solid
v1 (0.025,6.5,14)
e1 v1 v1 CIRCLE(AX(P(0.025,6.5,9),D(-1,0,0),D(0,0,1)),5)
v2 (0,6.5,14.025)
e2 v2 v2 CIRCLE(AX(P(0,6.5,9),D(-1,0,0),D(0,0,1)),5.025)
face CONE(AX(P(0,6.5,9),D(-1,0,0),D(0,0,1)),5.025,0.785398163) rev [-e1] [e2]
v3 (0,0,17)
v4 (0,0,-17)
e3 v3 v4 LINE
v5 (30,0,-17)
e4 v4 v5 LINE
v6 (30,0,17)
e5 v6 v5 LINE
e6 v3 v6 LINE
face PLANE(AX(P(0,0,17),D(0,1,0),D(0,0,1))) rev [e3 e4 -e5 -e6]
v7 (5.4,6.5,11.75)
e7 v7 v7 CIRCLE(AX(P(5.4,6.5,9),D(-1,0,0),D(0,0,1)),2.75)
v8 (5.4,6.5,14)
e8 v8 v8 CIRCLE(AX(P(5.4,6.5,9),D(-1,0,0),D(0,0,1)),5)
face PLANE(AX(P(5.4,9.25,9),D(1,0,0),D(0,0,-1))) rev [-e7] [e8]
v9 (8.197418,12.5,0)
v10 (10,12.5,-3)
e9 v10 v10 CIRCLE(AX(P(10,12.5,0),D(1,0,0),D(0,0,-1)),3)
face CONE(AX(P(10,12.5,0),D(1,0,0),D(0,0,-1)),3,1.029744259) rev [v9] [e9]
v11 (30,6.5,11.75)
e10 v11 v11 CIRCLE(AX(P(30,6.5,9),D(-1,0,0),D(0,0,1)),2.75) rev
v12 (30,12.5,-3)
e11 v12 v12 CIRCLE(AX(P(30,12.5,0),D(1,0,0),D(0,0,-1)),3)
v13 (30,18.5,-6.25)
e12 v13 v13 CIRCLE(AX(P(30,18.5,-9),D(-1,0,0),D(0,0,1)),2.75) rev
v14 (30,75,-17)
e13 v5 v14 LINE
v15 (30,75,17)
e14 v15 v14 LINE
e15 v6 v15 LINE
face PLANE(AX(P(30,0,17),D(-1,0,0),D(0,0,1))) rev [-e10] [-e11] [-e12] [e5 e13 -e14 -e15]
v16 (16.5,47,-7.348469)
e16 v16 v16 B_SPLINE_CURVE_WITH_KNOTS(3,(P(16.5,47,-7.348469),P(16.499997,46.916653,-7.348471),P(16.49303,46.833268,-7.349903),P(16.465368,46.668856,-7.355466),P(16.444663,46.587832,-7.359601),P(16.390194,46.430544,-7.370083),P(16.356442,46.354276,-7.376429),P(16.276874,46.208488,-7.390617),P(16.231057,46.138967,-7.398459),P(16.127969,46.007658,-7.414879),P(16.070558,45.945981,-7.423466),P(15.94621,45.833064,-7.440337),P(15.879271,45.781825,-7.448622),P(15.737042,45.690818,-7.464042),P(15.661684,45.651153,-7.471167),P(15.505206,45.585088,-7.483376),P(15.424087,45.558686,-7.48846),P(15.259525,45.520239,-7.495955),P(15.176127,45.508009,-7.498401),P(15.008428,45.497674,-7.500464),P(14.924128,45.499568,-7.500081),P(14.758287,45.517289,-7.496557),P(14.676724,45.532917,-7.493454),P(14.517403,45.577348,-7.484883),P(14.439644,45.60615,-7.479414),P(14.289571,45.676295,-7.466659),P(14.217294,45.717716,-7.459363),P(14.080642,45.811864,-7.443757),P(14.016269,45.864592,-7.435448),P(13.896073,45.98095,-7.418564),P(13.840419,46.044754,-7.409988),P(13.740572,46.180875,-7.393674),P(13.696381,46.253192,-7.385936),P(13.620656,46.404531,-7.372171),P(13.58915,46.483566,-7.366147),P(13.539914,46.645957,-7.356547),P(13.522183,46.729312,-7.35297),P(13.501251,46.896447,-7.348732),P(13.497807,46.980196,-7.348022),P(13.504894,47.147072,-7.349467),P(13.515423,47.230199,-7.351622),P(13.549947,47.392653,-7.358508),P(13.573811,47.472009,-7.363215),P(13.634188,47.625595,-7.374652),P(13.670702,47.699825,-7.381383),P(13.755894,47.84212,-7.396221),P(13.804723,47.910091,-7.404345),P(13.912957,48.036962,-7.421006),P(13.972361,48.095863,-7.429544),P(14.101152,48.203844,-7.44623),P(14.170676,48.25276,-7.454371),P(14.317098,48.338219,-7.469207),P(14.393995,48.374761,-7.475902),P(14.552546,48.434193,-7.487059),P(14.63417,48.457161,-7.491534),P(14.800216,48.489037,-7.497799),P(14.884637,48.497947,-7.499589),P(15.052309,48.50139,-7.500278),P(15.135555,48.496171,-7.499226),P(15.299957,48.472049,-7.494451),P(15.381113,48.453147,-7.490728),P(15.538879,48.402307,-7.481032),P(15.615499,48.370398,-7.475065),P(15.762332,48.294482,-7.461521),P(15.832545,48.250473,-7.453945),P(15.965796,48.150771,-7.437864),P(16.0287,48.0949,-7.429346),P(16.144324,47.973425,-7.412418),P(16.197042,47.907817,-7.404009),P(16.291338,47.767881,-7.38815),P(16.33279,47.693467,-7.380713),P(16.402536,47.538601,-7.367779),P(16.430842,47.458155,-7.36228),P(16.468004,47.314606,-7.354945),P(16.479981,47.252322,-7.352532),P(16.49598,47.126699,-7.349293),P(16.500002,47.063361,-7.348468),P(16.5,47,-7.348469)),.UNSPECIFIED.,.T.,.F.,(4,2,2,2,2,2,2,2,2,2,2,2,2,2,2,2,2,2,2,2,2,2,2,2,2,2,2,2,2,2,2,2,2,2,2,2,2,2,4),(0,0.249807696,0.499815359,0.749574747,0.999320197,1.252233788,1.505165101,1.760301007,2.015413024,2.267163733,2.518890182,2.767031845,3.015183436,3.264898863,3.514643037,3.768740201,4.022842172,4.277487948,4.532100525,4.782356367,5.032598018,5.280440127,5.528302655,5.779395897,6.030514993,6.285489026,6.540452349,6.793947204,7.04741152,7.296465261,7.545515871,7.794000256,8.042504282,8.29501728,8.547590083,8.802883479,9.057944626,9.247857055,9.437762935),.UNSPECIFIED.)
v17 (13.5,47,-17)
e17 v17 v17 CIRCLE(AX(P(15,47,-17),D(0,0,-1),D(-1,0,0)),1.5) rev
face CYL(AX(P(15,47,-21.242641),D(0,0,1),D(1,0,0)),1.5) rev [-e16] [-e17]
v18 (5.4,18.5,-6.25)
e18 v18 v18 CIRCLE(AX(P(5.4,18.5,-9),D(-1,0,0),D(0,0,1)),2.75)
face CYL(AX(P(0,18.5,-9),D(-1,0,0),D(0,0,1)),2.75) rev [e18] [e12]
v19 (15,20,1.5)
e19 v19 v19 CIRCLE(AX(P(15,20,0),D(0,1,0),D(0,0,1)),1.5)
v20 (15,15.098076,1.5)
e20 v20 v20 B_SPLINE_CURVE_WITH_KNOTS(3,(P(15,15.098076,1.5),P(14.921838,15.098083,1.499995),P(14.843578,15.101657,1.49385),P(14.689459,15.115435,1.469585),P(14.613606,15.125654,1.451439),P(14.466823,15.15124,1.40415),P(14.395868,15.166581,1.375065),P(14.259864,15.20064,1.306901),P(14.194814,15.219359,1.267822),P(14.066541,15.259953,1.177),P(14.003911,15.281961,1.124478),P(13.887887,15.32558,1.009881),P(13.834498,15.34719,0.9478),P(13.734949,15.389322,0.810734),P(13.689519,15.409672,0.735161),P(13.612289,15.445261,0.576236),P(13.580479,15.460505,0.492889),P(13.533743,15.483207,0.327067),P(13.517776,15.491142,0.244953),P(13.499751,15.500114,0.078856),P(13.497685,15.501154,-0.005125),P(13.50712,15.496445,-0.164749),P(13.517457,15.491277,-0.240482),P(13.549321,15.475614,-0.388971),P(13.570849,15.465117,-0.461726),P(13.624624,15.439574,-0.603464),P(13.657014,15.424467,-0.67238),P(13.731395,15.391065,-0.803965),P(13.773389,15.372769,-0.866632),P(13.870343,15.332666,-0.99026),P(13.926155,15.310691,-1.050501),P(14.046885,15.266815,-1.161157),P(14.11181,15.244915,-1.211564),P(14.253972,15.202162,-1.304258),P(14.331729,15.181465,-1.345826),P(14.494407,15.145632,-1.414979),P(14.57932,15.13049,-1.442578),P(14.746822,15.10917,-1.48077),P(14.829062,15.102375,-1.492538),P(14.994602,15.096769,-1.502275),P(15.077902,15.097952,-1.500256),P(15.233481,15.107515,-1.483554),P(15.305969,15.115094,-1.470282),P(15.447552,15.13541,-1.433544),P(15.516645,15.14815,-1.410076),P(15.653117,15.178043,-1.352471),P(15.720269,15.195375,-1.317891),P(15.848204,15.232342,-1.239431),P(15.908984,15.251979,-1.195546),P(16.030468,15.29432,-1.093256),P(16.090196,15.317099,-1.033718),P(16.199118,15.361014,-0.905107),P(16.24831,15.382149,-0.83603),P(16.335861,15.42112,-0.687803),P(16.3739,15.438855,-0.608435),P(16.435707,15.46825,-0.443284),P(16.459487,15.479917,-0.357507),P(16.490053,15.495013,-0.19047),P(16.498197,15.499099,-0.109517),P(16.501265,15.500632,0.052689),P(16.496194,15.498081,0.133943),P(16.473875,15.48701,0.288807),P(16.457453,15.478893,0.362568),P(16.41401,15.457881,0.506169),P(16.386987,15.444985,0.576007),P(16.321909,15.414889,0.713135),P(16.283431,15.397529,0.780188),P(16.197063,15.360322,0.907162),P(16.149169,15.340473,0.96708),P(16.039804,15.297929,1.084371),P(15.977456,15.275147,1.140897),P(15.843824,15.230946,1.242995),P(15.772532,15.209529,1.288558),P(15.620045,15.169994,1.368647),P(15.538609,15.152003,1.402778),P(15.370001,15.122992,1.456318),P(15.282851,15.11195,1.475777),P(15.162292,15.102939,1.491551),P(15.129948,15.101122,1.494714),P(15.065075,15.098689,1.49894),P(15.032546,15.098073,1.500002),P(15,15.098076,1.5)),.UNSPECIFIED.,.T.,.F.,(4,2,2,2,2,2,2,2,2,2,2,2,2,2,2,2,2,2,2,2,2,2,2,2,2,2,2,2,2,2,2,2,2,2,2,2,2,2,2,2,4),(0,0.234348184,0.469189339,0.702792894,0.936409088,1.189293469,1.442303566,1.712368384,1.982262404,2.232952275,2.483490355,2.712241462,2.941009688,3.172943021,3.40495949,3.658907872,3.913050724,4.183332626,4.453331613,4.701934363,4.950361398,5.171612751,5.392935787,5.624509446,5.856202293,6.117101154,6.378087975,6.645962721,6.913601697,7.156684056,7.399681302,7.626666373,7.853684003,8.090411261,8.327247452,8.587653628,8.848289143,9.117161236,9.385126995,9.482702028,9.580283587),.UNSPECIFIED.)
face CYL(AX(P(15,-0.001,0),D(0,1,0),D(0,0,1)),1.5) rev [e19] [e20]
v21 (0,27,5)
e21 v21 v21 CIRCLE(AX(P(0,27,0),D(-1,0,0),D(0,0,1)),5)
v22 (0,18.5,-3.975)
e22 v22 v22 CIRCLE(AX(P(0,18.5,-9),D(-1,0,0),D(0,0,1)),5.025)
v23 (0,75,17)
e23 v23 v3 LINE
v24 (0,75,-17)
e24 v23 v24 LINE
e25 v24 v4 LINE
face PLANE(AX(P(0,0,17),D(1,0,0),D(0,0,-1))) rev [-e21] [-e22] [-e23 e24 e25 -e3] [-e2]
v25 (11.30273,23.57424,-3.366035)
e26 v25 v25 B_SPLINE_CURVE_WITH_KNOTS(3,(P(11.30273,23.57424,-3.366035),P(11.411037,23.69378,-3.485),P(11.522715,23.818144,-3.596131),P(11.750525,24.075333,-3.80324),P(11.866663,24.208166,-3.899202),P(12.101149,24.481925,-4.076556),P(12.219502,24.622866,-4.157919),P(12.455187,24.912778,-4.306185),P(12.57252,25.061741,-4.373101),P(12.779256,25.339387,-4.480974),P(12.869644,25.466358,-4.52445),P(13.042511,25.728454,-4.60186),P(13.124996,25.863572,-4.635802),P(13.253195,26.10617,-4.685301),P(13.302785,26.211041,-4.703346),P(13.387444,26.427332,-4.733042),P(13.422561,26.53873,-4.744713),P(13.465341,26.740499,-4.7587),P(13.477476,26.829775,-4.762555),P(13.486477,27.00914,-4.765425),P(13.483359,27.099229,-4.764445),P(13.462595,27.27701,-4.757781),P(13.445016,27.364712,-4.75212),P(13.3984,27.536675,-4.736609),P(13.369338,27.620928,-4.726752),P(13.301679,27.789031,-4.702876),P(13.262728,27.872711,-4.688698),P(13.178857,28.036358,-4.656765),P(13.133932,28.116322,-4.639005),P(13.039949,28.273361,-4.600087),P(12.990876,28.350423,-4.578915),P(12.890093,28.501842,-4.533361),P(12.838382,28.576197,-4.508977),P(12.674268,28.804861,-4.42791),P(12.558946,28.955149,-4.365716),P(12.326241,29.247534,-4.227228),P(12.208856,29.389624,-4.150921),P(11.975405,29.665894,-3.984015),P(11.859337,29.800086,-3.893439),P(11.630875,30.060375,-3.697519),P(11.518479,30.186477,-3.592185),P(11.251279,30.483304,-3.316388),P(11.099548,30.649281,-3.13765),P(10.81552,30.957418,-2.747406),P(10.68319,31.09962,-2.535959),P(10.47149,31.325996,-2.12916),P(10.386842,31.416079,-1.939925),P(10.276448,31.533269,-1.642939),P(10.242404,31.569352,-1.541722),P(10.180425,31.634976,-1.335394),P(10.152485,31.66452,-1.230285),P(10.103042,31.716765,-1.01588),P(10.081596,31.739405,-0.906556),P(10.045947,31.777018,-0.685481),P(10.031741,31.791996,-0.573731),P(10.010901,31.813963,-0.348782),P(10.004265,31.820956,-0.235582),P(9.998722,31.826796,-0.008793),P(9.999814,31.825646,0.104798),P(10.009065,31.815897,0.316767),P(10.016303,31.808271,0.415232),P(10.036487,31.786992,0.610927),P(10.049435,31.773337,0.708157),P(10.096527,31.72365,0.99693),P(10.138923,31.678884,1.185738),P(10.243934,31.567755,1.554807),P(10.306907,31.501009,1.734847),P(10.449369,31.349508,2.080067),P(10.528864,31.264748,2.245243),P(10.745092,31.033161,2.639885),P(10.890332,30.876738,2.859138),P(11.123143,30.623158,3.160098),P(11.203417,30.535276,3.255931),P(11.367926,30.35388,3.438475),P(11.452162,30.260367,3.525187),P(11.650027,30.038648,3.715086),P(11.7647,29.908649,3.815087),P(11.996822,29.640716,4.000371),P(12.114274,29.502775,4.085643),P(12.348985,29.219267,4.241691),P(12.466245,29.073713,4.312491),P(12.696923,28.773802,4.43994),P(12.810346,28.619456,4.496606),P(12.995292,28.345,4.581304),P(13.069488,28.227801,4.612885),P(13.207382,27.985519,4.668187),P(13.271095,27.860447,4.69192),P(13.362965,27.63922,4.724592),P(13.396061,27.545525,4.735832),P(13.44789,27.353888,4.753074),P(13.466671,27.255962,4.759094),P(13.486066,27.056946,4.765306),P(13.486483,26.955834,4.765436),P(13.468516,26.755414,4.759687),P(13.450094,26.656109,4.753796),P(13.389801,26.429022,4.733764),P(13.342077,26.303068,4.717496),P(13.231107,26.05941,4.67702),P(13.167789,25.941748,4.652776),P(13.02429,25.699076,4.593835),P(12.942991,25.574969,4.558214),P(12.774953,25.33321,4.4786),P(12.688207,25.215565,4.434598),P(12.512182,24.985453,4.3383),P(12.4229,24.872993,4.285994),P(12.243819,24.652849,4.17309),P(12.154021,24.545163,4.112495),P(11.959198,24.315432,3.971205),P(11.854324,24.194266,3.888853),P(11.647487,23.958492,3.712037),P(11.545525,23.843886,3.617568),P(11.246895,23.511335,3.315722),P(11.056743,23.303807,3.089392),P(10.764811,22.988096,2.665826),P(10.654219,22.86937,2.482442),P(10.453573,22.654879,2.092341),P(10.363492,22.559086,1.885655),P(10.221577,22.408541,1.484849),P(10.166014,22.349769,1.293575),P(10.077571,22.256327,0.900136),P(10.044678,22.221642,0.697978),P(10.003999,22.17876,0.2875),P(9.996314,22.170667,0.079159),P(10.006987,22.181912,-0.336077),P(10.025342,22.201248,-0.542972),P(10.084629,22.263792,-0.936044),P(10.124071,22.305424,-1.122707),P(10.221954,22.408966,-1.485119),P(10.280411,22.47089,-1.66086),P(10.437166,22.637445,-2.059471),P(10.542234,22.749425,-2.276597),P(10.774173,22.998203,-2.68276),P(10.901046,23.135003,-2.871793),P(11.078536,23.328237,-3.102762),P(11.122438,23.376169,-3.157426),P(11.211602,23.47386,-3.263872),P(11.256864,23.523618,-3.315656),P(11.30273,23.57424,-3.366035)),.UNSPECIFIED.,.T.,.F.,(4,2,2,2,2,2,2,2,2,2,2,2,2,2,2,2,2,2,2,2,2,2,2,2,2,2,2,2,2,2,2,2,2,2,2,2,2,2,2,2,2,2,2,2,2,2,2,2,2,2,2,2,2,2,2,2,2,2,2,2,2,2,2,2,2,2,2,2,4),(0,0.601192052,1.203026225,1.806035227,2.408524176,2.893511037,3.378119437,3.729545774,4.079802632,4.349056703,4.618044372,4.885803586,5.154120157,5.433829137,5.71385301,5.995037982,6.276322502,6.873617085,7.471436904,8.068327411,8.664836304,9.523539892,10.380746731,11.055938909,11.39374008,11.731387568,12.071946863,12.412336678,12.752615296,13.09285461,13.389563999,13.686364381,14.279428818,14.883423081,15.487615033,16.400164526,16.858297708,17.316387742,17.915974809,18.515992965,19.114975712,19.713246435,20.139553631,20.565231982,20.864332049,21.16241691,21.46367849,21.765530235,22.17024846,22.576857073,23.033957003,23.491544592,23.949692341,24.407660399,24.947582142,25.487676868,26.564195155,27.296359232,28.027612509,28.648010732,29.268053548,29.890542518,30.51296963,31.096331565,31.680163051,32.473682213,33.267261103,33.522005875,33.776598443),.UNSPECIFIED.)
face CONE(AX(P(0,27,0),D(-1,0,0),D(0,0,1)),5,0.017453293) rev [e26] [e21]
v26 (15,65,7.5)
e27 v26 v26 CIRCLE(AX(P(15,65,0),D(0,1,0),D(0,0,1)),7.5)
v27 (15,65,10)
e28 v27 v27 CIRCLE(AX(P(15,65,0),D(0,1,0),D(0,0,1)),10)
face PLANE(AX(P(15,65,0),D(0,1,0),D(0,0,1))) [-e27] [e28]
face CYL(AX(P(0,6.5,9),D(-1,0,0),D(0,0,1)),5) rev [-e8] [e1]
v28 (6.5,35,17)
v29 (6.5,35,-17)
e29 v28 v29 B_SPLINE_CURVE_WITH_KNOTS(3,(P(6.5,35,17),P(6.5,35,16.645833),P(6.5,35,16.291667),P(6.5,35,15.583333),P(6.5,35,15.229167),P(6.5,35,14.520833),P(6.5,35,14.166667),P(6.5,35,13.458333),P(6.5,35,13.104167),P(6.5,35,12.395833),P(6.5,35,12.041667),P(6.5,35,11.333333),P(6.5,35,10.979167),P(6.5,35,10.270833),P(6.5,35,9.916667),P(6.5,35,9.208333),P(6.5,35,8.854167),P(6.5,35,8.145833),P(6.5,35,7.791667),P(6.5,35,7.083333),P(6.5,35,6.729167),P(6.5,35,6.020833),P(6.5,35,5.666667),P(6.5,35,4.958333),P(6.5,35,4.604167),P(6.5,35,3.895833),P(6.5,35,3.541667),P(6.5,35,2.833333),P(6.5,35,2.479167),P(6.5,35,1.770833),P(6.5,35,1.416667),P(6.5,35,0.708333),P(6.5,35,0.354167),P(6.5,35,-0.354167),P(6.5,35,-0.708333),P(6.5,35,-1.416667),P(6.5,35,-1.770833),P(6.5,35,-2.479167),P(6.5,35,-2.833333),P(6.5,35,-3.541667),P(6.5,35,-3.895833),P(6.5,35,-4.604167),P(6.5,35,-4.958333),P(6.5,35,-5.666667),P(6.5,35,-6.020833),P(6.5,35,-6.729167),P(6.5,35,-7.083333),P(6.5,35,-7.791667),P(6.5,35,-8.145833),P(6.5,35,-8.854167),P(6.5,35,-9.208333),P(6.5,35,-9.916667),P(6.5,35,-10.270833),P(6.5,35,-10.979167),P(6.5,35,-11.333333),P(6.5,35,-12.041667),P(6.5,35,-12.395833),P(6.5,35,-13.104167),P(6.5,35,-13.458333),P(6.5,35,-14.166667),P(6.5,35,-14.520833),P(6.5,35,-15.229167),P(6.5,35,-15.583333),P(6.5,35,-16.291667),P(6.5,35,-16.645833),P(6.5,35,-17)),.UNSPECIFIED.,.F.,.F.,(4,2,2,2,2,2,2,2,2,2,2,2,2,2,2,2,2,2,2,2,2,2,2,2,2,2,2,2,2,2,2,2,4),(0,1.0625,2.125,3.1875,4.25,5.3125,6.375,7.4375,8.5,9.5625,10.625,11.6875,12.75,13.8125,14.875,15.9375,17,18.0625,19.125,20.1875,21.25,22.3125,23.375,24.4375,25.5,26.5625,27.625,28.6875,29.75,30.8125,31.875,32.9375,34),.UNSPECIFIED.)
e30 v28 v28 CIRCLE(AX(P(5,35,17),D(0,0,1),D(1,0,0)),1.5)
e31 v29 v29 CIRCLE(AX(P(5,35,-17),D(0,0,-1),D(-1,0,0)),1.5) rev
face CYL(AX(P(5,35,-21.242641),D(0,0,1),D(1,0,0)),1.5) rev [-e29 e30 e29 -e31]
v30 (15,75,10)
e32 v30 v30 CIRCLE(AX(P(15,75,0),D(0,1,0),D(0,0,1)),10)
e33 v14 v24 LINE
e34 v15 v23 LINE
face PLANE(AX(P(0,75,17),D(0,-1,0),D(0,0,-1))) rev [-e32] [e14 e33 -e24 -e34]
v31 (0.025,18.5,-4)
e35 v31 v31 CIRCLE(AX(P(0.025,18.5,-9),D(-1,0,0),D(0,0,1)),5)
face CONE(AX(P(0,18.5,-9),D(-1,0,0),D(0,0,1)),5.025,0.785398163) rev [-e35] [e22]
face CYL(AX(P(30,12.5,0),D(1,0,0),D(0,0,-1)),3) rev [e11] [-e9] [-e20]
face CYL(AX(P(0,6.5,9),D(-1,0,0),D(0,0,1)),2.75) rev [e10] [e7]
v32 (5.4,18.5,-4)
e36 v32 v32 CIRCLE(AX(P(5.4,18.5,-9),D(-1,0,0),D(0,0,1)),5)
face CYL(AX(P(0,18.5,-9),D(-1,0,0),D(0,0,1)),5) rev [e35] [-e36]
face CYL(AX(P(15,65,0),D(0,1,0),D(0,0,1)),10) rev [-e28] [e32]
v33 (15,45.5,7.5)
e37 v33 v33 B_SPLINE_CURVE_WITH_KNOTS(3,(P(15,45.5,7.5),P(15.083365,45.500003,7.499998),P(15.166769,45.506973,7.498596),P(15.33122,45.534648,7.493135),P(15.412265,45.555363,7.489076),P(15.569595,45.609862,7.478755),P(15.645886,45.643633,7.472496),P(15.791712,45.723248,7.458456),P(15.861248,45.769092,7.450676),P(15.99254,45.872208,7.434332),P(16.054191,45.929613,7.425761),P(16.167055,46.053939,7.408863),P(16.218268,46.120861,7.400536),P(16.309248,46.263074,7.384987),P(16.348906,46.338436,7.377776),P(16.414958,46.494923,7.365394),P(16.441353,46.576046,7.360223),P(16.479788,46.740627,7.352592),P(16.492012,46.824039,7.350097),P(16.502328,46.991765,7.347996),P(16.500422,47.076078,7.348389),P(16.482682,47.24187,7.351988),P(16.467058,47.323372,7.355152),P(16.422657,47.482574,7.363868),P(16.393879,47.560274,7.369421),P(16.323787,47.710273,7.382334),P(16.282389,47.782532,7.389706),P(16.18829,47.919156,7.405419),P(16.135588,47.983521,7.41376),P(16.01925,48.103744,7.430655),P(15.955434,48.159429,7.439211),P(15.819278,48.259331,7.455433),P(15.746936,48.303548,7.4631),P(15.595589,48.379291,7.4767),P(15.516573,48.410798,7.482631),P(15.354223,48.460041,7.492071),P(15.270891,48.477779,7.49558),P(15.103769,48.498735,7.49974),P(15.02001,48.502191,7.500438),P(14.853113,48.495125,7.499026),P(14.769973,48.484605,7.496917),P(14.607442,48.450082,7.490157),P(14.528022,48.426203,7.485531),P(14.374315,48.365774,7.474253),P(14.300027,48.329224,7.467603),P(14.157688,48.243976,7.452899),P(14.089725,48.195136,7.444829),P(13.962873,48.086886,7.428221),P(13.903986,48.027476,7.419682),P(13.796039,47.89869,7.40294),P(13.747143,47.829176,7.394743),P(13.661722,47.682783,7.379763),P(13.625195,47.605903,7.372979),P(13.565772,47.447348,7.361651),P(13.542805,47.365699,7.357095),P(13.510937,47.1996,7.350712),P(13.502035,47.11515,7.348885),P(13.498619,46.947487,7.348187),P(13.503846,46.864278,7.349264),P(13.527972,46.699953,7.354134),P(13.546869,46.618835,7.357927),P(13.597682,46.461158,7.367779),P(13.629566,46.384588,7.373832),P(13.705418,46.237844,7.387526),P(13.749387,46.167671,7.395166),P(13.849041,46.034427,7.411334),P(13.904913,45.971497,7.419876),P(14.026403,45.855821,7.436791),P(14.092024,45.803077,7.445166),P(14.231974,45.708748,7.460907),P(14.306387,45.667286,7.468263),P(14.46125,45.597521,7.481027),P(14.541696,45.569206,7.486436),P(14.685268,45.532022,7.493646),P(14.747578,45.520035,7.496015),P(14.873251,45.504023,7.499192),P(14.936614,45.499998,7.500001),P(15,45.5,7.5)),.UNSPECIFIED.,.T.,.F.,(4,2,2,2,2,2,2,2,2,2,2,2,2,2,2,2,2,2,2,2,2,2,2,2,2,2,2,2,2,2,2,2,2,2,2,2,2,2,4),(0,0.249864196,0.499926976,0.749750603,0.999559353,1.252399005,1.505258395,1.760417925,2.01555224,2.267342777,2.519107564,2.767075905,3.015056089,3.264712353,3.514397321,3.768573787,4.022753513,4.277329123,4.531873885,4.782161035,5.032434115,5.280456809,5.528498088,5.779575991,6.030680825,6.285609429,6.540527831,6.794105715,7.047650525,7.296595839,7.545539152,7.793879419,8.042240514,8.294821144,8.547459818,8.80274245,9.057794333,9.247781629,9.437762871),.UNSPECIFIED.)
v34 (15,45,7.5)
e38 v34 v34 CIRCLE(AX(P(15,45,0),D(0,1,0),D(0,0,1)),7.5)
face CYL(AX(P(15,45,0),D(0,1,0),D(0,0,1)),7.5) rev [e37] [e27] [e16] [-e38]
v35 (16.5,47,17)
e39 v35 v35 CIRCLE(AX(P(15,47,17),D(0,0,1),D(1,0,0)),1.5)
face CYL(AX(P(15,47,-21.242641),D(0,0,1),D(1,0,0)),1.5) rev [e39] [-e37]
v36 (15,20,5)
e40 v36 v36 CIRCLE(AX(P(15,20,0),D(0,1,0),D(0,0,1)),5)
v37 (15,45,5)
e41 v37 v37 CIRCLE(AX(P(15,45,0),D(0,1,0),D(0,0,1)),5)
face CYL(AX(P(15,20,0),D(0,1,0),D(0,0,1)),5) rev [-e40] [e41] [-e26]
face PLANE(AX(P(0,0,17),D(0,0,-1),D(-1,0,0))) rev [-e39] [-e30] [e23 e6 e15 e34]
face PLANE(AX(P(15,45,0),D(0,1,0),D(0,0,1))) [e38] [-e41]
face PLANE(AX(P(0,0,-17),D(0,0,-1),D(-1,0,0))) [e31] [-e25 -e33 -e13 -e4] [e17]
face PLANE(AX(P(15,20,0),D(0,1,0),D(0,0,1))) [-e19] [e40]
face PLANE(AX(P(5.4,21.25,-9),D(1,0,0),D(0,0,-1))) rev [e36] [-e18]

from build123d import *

# Parameters (mm, degrees)
SCHIZZO1_W                    = 30
SCHIZZO1_H                    = 75
ESTRUSIONE_ESTRUSIONE1_DEPTH  = 17
FORO_6_0_6_1_D                = 6
FORO_6_0_6_1_DEPTH            = 20
FORO_6_0_6_1_TIP              = 1.802581857
SCHIZZO6_R                    = 10
TAGLIO_ESTRUSIONE1_DEPTH      = 10
SCHIZZO7_R                    = 7.5
TAGLIO_ESTRUSIONE2_DEPTH      = 20
SCHIZZO8_R                    = 5
TAGLIO_ESTRUSIONE3_DEPTH      = 25
TAGLIO_ESTRUSIONE4_REACH      = 66.915
TAGLIO_ESTRUSIONE4_END_RADIUS = 3
SCHIZZO9_R                    = 1.5
TAGLIO_ESTRUSIONE5_REACH      = 84.547
TAGLIO_ESTRUSIONE5_END_RADIUS = 5
SCHIZZO10_R                   = 5
TAGLIO_ESTRUSIONE5_DRAFT      = -1
TAGLIO_ESTRUSIONE6_REACH      = 89.641
SCHIZZO11_R                   = 1.5


# Read off the part's stored shape, not the designer's step: Foro lamato per Vite M5 a testa cilindrica-1
with BuildPart() as part:
    # Schizzo1 → Estrusione-Estrusione1 (new, symmetric)
    with BuildSketch(Plane.XY):
        with Locations((15, 37.5)):
            Rectangle(SCHIZZO1_W, SCHIZZO1_H)
    extrude(amount=ESTRUSIONE_ESTRUSIONE1_DEPTH, both=True)

    # Foro Ø6.0 (6)-1
    with Locations(Plane(origin=(30, 12.5, 0), x_dir=(0, 0, 1), z_dir=(1, 0, 0))):
        with Locations((0, 0)):
            Hole(FORO_6_0_6_1_D / 2, depth=FORO_6_0_6_1_DEPTH)
            with Locations((0, 0, -(FORO_6_0_6_1_DEPTH + FORO_6_0_6_1_TIP / 2))):  # 118° drill point
                Cone(0, FORO_6_0_6_1_D / 2, FORO_6_0_6_1_TIP, mode=Mode.SUBTRACT)

    # Foro lamato per Vite M5 a testa cili 2 → Foro lamato per Vite M5 a testa cilindrica-1 (revolve, cut)
    with BuildSketch(Plane(origin=(0, 6.5, 9), x_dir=(0, 1, 0), z_dir=(0, 0, -1))):
        Polygon((2.75, 5.4), (2.75, 30), (0, 30), (0, 0), (5.025, 0), (5, 0.025), (5, 5.4), align=None)
    revolve(axis=Axis((0, 6.5, 9), (1, 0, 0)), mode=Mode.SUBTRACT)

    # Foro lamato per Vite M5 a testa cili 3 o → Foro lamato per Vite M5 a testa cili 3 (revolve, cut)
    with BuildSketch(Plane(origin=(0, 18.5, -9), x_dir=(0, 1, 0), z_dir=(0, 0, -1))):
        Polygon((0, 0), (5.025, 0), (5, 0.025), (5, 5.4), (2.75, 5.4), (2.75, 30), (0, 30), align=None)
    revolve(axis=Axis((0, 18.5, -9), (1, 0, 0)), mode=Mode.SUBTRACT)

    # Schizzo6 → Taglio-Estrusione1 (cut)
    with BuildSketch(Plane(origin=(0, 75, 0), x_dir=(1, 0, 0), z_dir=(0, 1, 0))):
        with Locations(Location((15, 0, 0), (0, 0, 270))):
            Circle(SCHIZZO6_R)
    extrude(amount=-TAGLIO_ESTRUSIONE1_DEPTH, mode=Mode.SUBTRACT)

    # Schizzo7 → Taglio-Estrusione2 (cut)
    with BuildSketch(Plane(origin=(0, 65, 0), x_dir=(1, 0, 0), z_dir=(0, 1, 0))):
        with Locations(Location((15, 0, 0), (0, 0, 270))):
            Circle(SCHIZZO7_R)
    extrude(amount=-TAGLIO_ESTRUSIONE2_DEPTH, mode=Mode.SUBTRACT)

    # Schizzo8 → Taglio-Estrusione3 (cut)
    with BuildSketch(Plane(origin=(0, 45, 0), x_dir=(1, 0, 0), z_dir=(0, 1, 0))):
        with Locations(Location((15, 0, 0), (0, 0, 270))):
            Circle(SCHIZZO8_R)
    extrude(amount=-TAGLIO_ESTRUSIONE3_DEPTH, mode=Mode.SUBTRACT)

    # Taglio-Estrusione4: up to this cylinder (the profile starts outside it)
    taglio_estrusione4_end = Plane(origin=(15, 12.5, 0), z_dir=(1, 0, 0)) * Cylinder(TAGLIO_ESTRUSIONE4_END_RADIUS, 140.83, mode=Mode.PRIVATE)
    # Schizzo9 → Taglio-Estrusione4 (cut, up to the surface)
    with BuildSketch(Plane(origin=(0, 20, 0), x_dir=(1, 0, 0), z_dir=(0, 1, 0)), mode=Mode.PRIVATE) as taglio_estrusione4_sk1:
        with Locations(Location((15, 0, 0), (0, 0, 270))):
            Circle(SCHIZZO9_R)
    taglio_estrusione4_tool1 = extrude(taglio_estrusione4_sk1.sketch, amount=-TAGLIO_ESTRUSIONE4_REACH, mode=Mode.PRIVATE) - taglio_estrusione4_end
    add(taglio_estrusione4_tool1.solids().sort_by_distance((15, 20, 0))[0], mode=Mode.SUBTRACT)

    # Taglio-Estrusione5: up to this cylinder (the profile starts outside it)
    taglio_estrusione5_end = Plane(origin=(15, 27, 0), z_dir=(0, 1, 0)) * Cylinder(TAGLIO_ESTRUSIONE5_END_RADIUS, 180.094, mode=Mode.PRIVATE)



with BuildPart() as taglio_estrusione5_long_prism_1:
    # Schizzo10 → Taglio-Estrusione5 (the long prism of profile 1, to be tilted and cut off)
    with BuildSketch(Plane.ZY):
        with Locations((0, 27)):
            Circle(SCHIZZO10_R)
    extrude(amount=-TAGLIO_ESTRUSIONE5_REACH)
    taglio_estrusione5_tool1_sides = [taglio_estrusione5_long_prism_1.faces().sort_by_distance(p)[0] for p in [
        (42.2735, 27, -5),
    ]]
    draft(taglio_estrusione5_tool1_sides, Plane.ZY, TAGLIO_ESTRUSIONE5_DRAFT)  # the draft: side faces tilted about the start plane


with BuildPart() as part_1:
    add(part.part)
    taglio_estrusione5_tool1 = taglio_estrusione5_long_prism_1.part - taglio_estrusione5_end
    add(taglio_estrusione5_tool1.solids().sort_by_distance((0, 27, 0))[0], mode=Mode.SUBTRACT)

    # Taglio-Estrusione6: up to this face of the body (flat: up to its plane)
    taglio_estrusione6_end = Plane(part_1.part.faces().sort_by_distance((15, 37.5, -17))[0])
    # Schizzo11 → Taglio-Estrusione6 (cut, up to the picked face)
    with BuildSketch(Plane.XY.offset(17), mode=Mode.PRIVATE) as taglio_estrusione6_sk1:
        with Locations((5, 35)):
            Circle(SCHIZZO11_R)
    taglio_estrusione6_tool1 = split(extrude(taglio_estrusione6_sk1.sketch, amount=-TAGLIO_ESTRUSIONE6_REACH, mode=Mode.PRIVATE), bisect_by=taglio_estrusione6_end, keep=Keep.BOTH, mode=Mode.PRIVATE)
    # Schizzo11 → Taglio-Estrusione6 (cut, up to the picked face)
    with BuildSketch(Plane.XY.offset(17), mode=Mode.PRIVATE) as taglio_estrusione6_sk2:
        with Locations((15, 47)):
            Circle(SCHIZZO11_R)
    taglio_estrusione6_tool2 = split(extrude(taglio_estrusione6_sk2.sketch, amount=-TAGLIO_ESTRUSIONE6_REACH, mode=Mode.PRIVATE), bisect_by=taglio_estrusione6_end, keep=Keep.BOTH, mode=Mode.PRIVATE)
    add(taglio_estrusione6_tool1.solids().sort_by(Axis((5, 35, 17), (0, 0, -1)))[0], mode=Mode.SUBTRACT)
    add(taglio_estrusione6_tool2.solids().sort_by(Axis((15, 47, 17), (0, 0, -1)))[0], mode=Mode.SUBTRACT)


solid = part_1.part
